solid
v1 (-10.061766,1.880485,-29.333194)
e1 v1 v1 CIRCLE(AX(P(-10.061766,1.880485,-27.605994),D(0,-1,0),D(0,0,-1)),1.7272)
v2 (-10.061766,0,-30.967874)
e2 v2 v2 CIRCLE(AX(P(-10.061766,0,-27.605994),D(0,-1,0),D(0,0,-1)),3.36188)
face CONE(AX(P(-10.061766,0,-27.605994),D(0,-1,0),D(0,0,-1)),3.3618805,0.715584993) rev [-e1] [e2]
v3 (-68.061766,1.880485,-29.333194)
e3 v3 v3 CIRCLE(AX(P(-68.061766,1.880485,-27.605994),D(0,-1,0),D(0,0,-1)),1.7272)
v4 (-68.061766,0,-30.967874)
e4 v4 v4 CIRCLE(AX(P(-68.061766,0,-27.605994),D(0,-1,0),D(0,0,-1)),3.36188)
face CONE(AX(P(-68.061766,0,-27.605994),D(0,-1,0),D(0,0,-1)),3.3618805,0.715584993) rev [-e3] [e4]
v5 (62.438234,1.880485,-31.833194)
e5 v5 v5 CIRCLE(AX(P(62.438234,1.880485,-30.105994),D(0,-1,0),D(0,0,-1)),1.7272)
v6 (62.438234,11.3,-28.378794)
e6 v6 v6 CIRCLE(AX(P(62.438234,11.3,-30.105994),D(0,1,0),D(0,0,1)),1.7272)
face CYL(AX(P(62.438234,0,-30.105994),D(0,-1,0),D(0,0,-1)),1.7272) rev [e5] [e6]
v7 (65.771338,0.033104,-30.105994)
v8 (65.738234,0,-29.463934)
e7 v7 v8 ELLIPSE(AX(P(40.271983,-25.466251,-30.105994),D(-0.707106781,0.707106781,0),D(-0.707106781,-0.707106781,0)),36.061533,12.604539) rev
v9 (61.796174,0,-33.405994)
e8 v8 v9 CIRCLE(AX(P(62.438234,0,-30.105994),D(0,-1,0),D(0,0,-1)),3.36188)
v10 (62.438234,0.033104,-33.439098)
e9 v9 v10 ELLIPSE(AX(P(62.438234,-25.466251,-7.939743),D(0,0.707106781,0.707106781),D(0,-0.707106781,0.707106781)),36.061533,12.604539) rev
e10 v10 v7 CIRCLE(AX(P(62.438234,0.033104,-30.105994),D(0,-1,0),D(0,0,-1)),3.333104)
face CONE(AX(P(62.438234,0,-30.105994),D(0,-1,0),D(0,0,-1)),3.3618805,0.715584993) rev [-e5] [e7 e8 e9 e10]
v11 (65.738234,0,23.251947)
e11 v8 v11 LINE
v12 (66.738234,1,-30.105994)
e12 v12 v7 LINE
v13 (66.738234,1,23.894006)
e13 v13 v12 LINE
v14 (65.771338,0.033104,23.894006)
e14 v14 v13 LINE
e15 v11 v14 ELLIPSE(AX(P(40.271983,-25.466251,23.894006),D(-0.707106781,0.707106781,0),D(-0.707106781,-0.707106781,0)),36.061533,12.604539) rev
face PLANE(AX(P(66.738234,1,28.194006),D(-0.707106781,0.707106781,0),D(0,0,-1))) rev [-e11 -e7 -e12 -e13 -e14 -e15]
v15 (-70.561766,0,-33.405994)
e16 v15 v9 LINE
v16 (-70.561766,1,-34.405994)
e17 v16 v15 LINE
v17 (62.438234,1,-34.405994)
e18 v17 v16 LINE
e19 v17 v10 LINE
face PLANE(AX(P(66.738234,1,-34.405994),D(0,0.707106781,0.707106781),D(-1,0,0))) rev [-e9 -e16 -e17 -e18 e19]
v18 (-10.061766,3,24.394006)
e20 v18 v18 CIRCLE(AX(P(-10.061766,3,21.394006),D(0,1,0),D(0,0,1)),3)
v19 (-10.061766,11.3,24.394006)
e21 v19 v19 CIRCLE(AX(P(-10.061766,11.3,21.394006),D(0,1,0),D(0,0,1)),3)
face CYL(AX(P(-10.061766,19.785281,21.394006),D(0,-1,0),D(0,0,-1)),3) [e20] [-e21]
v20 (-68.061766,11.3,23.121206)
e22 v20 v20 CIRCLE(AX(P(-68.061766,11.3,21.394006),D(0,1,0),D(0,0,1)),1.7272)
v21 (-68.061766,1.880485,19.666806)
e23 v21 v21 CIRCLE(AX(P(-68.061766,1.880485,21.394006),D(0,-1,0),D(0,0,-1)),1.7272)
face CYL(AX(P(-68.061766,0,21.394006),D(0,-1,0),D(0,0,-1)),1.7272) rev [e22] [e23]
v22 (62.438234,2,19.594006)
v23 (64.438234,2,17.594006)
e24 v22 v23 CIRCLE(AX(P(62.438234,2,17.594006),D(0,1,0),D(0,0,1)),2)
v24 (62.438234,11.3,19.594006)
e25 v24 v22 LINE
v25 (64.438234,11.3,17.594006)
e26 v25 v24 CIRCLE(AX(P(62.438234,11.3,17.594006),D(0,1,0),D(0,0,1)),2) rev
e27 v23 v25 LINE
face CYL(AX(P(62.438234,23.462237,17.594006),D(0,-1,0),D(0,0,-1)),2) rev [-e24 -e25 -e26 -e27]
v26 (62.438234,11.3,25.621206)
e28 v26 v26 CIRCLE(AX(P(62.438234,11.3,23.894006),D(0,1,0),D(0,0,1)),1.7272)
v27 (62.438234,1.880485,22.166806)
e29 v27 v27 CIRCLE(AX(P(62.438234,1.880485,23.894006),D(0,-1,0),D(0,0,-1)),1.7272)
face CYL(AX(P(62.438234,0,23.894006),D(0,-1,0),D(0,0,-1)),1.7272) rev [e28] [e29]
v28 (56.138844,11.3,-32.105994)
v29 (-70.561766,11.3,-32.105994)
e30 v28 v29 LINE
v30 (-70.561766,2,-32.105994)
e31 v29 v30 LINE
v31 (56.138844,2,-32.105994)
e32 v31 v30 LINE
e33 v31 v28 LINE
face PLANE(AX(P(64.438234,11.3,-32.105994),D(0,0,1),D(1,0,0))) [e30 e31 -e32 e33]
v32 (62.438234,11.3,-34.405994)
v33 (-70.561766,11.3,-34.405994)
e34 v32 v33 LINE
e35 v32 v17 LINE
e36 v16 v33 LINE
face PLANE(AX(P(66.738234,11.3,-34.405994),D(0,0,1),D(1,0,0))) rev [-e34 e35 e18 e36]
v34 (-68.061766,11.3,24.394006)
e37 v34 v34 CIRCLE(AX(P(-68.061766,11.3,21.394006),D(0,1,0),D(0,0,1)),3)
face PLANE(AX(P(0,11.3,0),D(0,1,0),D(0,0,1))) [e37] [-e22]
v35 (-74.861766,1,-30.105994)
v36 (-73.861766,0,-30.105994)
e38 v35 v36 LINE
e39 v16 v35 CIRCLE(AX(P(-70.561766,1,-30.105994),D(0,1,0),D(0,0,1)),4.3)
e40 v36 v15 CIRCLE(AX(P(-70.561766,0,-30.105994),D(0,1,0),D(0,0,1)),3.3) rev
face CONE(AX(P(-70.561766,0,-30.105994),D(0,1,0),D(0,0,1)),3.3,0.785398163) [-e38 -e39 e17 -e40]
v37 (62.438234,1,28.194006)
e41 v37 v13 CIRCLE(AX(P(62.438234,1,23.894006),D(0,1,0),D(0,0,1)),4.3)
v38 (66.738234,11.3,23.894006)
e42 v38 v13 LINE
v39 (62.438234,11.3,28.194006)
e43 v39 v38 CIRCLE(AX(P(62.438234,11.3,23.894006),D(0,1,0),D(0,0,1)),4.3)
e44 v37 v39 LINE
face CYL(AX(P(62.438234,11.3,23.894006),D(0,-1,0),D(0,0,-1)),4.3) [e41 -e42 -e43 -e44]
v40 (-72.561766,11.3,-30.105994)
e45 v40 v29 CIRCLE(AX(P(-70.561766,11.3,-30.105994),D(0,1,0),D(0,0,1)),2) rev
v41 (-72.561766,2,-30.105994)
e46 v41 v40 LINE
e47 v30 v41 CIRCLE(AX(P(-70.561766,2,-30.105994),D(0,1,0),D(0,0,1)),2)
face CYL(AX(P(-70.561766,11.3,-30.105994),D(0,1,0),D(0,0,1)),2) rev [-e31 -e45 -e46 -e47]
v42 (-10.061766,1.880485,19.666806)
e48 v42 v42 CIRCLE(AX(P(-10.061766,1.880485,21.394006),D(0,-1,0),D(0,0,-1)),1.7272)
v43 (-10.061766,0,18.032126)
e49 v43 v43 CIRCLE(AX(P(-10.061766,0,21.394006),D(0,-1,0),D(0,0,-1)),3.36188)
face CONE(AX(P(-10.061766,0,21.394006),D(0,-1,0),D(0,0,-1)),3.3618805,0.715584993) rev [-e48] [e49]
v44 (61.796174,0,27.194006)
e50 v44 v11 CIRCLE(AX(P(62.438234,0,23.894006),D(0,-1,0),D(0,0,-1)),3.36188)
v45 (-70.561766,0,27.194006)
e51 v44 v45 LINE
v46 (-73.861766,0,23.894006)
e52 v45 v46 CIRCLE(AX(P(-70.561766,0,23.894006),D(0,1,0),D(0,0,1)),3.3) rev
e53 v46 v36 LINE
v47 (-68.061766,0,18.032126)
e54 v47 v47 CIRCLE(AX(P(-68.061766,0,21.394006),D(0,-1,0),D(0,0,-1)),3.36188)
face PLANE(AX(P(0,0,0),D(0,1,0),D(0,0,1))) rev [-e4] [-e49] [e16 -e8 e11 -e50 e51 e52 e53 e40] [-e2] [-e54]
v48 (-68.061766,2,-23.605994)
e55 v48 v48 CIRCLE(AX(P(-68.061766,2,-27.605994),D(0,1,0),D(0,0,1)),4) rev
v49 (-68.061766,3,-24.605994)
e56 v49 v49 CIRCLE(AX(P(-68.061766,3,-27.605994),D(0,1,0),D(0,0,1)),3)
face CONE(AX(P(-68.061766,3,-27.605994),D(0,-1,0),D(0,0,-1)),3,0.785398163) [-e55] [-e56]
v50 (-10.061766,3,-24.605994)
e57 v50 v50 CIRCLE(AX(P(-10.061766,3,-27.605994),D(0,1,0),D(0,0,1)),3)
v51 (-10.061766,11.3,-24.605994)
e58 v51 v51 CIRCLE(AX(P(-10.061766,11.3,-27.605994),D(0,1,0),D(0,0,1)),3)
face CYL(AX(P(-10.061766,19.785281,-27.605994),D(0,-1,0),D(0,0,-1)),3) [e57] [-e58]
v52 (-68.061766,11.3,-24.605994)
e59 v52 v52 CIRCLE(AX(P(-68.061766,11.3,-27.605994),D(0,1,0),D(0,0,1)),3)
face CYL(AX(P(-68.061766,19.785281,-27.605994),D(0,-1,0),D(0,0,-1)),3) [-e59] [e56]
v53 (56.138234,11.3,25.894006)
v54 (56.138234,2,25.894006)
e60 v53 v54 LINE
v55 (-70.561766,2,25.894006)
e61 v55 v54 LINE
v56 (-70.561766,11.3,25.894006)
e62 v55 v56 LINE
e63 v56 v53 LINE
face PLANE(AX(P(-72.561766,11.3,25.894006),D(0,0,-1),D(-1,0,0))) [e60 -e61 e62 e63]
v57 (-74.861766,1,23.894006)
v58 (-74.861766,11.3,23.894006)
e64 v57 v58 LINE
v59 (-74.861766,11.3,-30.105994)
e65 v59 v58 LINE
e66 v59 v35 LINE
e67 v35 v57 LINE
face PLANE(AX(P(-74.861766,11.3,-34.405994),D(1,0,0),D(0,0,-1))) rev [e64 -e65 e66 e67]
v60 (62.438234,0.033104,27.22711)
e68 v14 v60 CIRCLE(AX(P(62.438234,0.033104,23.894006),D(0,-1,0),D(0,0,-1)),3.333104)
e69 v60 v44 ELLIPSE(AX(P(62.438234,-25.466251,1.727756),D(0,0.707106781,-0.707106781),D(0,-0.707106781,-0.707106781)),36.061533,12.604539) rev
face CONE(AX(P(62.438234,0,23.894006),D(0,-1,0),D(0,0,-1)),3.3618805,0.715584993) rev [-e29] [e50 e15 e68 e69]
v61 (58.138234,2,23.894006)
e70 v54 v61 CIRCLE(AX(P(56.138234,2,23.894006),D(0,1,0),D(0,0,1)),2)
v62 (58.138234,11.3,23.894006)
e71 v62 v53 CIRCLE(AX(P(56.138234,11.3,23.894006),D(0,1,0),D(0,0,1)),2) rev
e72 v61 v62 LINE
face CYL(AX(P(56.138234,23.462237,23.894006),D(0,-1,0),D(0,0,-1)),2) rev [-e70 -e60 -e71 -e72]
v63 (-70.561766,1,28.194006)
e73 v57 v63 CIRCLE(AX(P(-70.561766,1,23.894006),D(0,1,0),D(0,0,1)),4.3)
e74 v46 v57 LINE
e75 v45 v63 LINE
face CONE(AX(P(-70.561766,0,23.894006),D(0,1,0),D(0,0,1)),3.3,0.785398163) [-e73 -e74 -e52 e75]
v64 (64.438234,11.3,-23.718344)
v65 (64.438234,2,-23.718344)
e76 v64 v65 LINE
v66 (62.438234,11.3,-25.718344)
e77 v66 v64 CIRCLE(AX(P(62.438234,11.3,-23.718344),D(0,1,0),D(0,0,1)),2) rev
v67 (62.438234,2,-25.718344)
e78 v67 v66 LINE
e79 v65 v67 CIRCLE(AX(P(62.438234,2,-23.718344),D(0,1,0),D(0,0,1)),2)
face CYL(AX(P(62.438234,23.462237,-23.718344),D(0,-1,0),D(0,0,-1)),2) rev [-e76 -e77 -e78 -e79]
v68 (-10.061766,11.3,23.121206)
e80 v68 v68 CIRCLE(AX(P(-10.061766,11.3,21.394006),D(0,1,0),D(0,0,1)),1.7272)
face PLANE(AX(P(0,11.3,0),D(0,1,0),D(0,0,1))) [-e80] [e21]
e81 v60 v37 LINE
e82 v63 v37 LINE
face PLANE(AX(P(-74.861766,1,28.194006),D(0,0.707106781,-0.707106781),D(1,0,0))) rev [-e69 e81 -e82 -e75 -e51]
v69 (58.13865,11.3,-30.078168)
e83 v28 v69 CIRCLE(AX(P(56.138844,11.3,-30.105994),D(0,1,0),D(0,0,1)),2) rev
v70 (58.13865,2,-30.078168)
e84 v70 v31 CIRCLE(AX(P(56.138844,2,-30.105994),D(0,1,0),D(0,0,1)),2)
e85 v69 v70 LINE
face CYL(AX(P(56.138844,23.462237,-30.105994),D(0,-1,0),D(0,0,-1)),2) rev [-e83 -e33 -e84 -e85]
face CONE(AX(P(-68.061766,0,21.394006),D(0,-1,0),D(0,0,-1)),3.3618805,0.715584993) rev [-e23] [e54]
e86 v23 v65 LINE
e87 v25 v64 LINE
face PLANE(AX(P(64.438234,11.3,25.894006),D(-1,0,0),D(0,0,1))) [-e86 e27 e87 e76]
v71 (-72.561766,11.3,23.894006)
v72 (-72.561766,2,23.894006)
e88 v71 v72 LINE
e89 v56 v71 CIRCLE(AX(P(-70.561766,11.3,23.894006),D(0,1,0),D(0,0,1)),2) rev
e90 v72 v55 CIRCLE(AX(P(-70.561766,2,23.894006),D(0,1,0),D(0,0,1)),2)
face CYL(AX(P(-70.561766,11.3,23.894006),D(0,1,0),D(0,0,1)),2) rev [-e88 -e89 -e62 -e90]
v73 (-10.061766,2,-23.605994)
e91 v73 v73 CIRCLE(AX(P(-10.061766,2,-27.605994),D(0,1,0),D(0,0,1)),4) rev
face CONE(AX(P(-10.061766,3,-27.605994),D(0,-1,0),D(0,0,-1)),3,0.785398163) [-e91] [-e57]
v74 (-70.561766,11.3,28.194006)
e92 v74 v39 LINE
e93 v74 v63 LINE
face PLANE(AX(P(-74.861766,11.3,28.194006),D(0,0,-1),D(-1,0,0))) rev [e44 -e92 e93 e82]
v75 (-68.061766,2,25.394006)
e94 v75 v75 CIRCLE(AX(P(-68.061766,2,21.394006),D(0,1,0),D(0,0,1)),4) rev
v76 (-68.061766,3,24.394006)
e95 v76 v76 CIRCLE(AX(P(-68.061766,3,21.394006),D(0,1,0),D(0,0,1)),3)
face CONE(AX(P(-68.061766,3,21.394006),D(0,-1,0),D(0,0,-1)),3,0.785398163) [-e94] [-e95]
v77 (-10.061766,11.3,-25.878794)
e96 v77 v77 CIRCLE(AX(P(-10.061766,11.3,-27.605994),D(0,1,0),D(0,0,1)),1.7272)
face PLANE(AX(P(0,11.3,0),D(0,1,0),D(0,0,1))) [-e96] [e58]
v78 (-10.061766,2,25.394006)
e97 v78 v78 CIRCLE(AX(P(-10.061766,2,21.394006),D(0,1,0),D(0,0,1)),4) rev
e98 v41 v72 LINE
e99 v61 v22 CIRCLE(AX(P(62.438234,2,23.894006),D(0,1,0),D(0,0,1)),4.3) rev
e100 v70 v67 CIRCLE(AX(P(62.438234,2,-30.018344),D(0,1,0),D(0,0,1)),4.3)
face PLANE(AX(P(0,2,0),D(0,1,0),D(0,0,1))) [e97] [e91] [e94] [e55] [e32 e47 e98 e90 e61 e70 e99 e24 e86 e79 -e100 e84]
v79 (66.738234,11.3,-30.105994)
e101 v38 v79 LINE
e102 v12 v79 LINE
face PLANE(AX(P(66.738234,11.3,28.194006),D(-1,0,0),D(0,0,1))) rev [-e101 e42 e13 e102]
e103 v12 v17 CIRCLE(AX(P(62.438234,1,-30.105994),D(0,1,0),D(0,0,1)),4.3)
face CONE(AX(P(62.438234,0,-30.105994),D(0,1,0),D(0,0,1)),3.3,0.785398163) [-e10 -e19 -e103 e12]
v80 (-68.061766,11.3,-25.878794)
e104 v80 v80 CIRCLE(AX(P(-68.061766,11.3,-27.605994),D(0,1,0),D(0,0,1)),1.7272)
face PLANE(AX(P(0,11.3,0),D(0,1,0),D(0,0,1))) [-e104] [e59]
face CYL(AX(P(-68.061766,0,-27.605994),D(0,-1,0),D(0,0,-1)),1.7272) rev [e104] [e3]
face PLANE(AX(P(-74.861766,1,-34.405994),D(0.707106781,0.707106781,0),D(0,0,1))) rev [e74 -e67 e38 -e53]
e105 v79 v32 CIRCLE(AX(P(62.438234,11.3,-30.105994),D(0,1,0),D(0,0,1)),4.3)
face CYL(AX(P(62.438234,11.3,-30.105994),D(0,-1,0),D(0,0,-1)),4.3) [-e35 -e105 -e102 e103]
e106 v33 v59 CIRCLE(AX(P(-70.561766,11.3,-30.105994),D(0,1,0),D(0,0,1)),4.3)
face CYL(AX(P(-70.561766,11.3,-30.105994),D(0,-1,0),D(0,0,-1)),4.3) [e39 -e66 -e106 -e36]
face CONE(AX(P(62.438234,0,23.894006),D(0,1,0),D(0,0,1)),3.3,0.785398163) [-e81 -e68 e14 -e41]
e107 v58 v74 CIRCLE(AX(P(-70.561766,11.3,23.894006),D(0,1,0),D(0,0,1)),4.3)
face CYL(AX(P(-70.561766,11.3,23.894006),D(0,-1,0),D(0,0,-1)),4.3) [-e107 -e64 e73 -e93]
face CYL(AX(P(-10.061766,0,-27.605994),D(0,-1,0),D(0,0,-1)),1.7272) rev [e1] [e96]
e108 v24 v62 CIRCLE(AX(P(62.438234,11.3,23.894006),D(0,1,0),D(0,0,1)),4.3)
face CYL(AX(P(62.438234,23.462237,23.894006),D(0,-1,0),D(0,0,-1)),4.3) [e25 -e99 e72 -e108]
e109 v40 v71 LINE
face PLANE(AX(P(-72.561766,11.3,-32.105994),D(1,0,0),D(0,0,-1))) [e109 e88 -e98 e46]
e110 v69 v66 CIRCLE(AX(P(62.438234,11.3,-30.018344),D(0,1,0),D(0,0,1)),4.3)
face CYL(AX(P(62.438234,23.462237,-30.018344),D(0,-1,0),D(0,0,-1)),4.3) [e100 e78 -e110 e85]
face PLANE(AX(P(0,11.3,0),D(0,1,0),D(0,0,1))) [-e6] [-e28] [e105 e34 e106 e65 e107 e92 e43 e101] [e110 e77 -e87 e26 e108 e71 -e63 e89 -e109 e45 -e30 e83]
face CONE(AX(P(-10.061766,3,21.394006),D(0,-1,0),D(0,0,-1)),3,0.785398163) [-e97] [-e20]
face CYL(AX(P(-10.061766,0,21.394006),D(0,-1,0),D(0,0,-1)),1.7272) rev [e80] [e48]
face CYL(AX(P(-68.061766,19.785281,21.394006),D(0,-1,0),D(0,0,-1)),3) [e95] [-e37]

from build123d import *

# Parameters (mm, degrees)
SKETCH3_W                                         = 141.6
SKETCH3_H                                         = 62.6
SKETCH3_W_2                                       = 137
SKETCH3_H_2                                       = 58
BOSS_EXTRUDE1_DEPTH                               = 11.3
SKETCH5_W                                         = 137
SKETCH5_H                                         = 58
BOSS_EXTRUDE2_DEPTH                               = 2
SKETCH6_R                                         = 3
BOSS_EXTRUDE3_DEPTH                               = 9.3
FILLET6_R                                         = 2
FILLET8_R                                         = 2
CHAMFER1_SIZE                                     = 1
SKETCH24_R                                        = 4.3
BOSS_EXTRUDE7_DEPTH                               = 9.3
FILLET21_R                                        = 2
FILLET22_R                                        = 2
FILLET20_R                                        = 4.3
CSK_FOR_4_FLAT_HEAD_SOCKET_CAP_SCREW1_D           = 3.4544
CSK_FOR_4_FLAT_HEAD_SOCKET_CAP_SCREW1_DEPTH       = 14
CSK_FOR_4_FLAT_HEAD_SOCKET_CAP_SCREW1_CSINK_D     = 6.723761
CSK_FOR_4_FLAT_HEAD_SOCKET_CAP_SCREW1_CSINK_ANGLE = 82
CSK_FOR_4_FLAT_HEAD_SOCKET_CAP_SCREW1_TIP         = 1.037806461
CHAMFER7_SIZE                                     = 1


# Some blends are built 0.0001 mm under size
with BuildPart() as part:
    # Sketch3 → Boss-Extrude1 (new body)
    with BuildSketch(Plane(origin=(0, 0, 0), x_dir=(1, 0, 0), z_dir=(0, 1, 0))):
        with Locations((-4.061766162, 3.105993834)):
            Rectangle(SKETCH3_W, SKETCH3_H)
        with Locations((-4.061766162, 3.105993834)):
            Rectangle(SKETCH3_W_2, SKETCH3_H_2, mode=Mode.SUBTRACT)
    extrude(amount=BOSS_EXTRUDE1_DEPTH)

    # Sketch5 → Boss-Extrude2 (add)
    with BuildSketch(Plane(origin=(0, 0, 0), x_dir=(1, 0, 0), z_dir=(0, 1, 0))):
        with Locations((-4.061766162, 3.105993834)):
            Rectangle(SKETCH5_W, SKETCH5_H)
    extrude(amount=BOSS_EXTRUDE2_DEPTH)

    # Sketch6 → Boss-Extrude3 (add)
    with BuildSketch(Plane(origin=(0, 2, 0), x_dir=(1, 0, 0), z_dir=(0, 1, 0))):
        with Locations(Location((-68.061766162, 27.605993834, 0), (0, 0, 270))):
            Circle(SKETCH6_R)
        with Locations(Location((-68.061766162, -21.394006166, 0), (0, 0, 270))):
            Circle(SKETCH6_R)
        with Locations(Location((-10.061766162, -21.394006166, 0), (0, 0, 270))):
            Circle(SKETCH6_R)
        with Locations(Location((-10.061766162, 27.605993834, 0), (0, 0, 270))):
            Circle(SKETCH6_R)
    extrude(amount=BOSS_EXTRUDE3_DEPTH)

    # Fillet6
    fillet6_edges = [part.edges().sort_by_distance(p)[0] for p in [
        (64.438233838, 6.65, -32.105993834),
    ]]
    fillet(fillet6_edges, radius=FILLET6_R)

    # Fillet8
    fillet8_edges = [part.edges().sort_by_distance(p)[0] for p in [
        (-72.561766162, 6.65, -32.105993834),
        (-72.561766162, 6.65, 25.894006166),
    ]]
    fillet(fillet8_edges, radius=FILLET8_R)

    # Chamfer1
    chamfer1_edges = [part.edges().sort_by_distance(p)[0] for p in [
        (-68.061766162, 2, -30.605993834),
        (-68.061766162, 2, 18.394006166),
        (-10.061766162, 2, 18.394006166),
        (-10.061766162, 2, -30.605993834),
    ]]
    chamfer(chamfer1_edges, length=CHAMFER1_SIZE)

    # Sketch24 → Boss-Extrude7 (add)
    with BuildSketch(Plane(origin=(0, 2, 0), x_dir=(1, 0, 0), z_dir=(0, 1, 0))):
        with Locations((62.438233838, -23.894006166)):
            Circle(SKETCH24_R)
        with Locations((62.438233838, 30.01834388)):
            Circle(SKETCH24_R)
    extrude(amount=BOSS_EXTRUDE7_DEPTH)

    # Fillet21
    fillet21_edges = [part.edges().sort_by_distance(p)[0] for p in [
        (58.631660576, 6.65, 25.894006166),
    ]]
    fillet(fillet21_edges, radius=FILLET21_R)

    # Fillet22
    fillet22_edges = [part.edges().sort_by_distance(p)[0] for p in [
        (64.438233838, 6.65, -26.211770618),
        (58.679016144, 6.65, -32.105993834),
        (64.438233838, 6.65, 20.087432904),
    ]]
    fillet(fillet22_edges, radius=FILLET22_R)

    # Fillet20
    fillet20_edges = [part.edges().sort_by_distance(p)[0] for p in [
        (-74.861766162, 5.65, -34.405993834),
        (66.738233838, 5.65, -34.405993834),
        (66.738233838, 5.65, 28.194006166),
        (-74.861766162, 5.65, 28.194006166),
    ]]
    fillet(fillet20_edges, radius=FILLET20_R - 0.0001)  # a hair under: the kernel refuses the full size

    # CSK for #4 Flat Head Socket Cap Screw1
    with Locations(Plane(origin=(0, 0, 0), x_dir=(-1, 0, 0), z_dir=(0, -1, 0))):
        with Locations((68.061766162, 27.605993834), (68.061766162, -21.394006166), (-62.438233838, 30.105993834), (-62.438233838, -23.894006166), (10.061766162, -21.394006166), (10.061766162, 27.605993834)):
            CounterSinkHole(CSK_FOR_4_FLAT_HEAD_SOCKET_CAP_SCREW1_D / 2, CSK_FOR_4_FLAT_HEAD_SOCKET_CAP_SCREW1_CSINK_D / 2, depth=CSK_FOR_4_FLAT_HEAD_SOCKET_CAP_SCREW1_DEPTH, counter_sink_angle=CSK_FOR_4_FLAT_HEAD_SOCKET_CAP_SCREW1_CSINK_ANGLE)
            with Locations((0, 0, -(CSK_FOR_4_FLAT_HEAD_SOCKET_CAP_SCREW1_DEPTH + CSK_FOR_4_FLAT_HEAD_SOCKET_CAP_SCREW1_TIP / 2))):  # 118° drill point
                Cone(0, CSK_FOR_4_FLAT_HEAD_SOCKET_CAP_SCREW1_D / 2, CSK_FOR_4_FLAT_HEAD_SOCKET_CAP_SCREW1_TIP, mode=Mode.SUBTRACT)

    # Chamfer7
    # the kernel refuses this chamfer: 1 mm, written as the material it takes off along each edge
    with BuildSketch(Plane(origin=(62.438333838, 0, -34.405993834), x_dir=(0, -0.027495876610586292, 0.9996219169112968), z_dir=(-1, 0, 0)), Plane(origin=(-70.561866162, 0, 28.194006166), x_dir=(0, -0.02749587661058639, -0.9996219169112968), z_dir=(1, 0, 0))) as chamfer7_piece_1:
        Polygon((CHAMFER7_SIZE * 0.999621916911, CHAMFER7_SIZE * 0.0274958766106), (-CHAMFER7_SIZE * 0.0274958766106, CHAMFER7_SIZE * 0.999621916911), (0, 0), align=None)
    extrude(amount=133.0002, mode=Mode.SUBTRACT)
    with BuildSketch(Plane(origin=(-74.861766162, 0, -30.106093834), x_dir=(0.9996219169112968, -0.027495876610586483, 0), z_dir=(0, 0, 1)), Plane(origin=(66.738233838, 0, 23.894106166), x_dir=(-0.9996219169112968, -0.027495876610586483, 0), z_dir=(0, 0, -1))) as chamfer7_piece_2:
        Polygon((CHAMFER7_SIZE * 0.999621916911, CHAMFER7_SIZE * 0.0274958766106), (-CHAMFER7_SIZE * 0.0274958766106, CHAMFER7_SIZE * 0.999621916911), (0, 0), align=None)
    extrude(amount=54.0002, mode=Mode.SUBTRACT)
    with BuildSketch(Plane(origin=(62.438333838, 0, 23.894106166), x_dir=(0, 0, 1), z_dir=(-1, 0, 0))) as chamfer7_piece_3:
        Polygon((4.2999 - CHAMFER7_SIZE, 0), (4.2999, CHAMFER7_SIZE), (4.2999, 0), align=None)
    revolve(axis=Axis((62.438333838, 0, 23.894106166), (0, 1, 0)), revolution_arc=90, mode=Mode.SUBTRACT)
    with BuildSketch(Plane(origin=(-70.561866162, 0, 23.894106166), x_dir=(0, 0, 1), z_dir=(1, 0, 0))) as chamfer7_piece_4:
        Polygon((4.2999 - CHAMFER7_SIZE, 0), (4.2999, -CHAMFER7_SIZE), (4.2999, 0), align=None)
    revolve(axis=Axis((-70.561866162, 0, 23.894106166), (0, -1, 0)), revolution_arc=90, mode=Mode.SUBTRACT)
    with BuildSketch(Plane(origin=(-70.561866162, 0, -30.106093834), x_dir=(0, 0, -1), z_dir=(1, 0, 0))) as chamfer7_piece_5:
        Polygon((4.2999 - CHAMFER7_SIZE, 0), (4.2999, CHAMFER7_SIZE), (4.2999, 0), align=None)
    revolve(axis=Axis((-70.561866162, 0, -30.106093834), (0, 1, 0)), revolution_arc=90, mode=Mode.SUBTRACT)
    with BuildSketch(Plane(origin=(62.438333838, 0, -30.106093834), x_dir=(1, 0, 0), z_dir=(0, 0, 1))) as chamfer7_piece_6:
        Polygon((4.2999 - CHAMFER7_SIZE, 0), (4.2999, CHAMFER7_SIZE), (4.2999, 0), align=None)
    revolve(axis=Axis((62.438333838, 0, -30.106093834), (0, 1, 0)), revolution_arc=90, mode=Mode.SUBTRACT)


solid = part.part
